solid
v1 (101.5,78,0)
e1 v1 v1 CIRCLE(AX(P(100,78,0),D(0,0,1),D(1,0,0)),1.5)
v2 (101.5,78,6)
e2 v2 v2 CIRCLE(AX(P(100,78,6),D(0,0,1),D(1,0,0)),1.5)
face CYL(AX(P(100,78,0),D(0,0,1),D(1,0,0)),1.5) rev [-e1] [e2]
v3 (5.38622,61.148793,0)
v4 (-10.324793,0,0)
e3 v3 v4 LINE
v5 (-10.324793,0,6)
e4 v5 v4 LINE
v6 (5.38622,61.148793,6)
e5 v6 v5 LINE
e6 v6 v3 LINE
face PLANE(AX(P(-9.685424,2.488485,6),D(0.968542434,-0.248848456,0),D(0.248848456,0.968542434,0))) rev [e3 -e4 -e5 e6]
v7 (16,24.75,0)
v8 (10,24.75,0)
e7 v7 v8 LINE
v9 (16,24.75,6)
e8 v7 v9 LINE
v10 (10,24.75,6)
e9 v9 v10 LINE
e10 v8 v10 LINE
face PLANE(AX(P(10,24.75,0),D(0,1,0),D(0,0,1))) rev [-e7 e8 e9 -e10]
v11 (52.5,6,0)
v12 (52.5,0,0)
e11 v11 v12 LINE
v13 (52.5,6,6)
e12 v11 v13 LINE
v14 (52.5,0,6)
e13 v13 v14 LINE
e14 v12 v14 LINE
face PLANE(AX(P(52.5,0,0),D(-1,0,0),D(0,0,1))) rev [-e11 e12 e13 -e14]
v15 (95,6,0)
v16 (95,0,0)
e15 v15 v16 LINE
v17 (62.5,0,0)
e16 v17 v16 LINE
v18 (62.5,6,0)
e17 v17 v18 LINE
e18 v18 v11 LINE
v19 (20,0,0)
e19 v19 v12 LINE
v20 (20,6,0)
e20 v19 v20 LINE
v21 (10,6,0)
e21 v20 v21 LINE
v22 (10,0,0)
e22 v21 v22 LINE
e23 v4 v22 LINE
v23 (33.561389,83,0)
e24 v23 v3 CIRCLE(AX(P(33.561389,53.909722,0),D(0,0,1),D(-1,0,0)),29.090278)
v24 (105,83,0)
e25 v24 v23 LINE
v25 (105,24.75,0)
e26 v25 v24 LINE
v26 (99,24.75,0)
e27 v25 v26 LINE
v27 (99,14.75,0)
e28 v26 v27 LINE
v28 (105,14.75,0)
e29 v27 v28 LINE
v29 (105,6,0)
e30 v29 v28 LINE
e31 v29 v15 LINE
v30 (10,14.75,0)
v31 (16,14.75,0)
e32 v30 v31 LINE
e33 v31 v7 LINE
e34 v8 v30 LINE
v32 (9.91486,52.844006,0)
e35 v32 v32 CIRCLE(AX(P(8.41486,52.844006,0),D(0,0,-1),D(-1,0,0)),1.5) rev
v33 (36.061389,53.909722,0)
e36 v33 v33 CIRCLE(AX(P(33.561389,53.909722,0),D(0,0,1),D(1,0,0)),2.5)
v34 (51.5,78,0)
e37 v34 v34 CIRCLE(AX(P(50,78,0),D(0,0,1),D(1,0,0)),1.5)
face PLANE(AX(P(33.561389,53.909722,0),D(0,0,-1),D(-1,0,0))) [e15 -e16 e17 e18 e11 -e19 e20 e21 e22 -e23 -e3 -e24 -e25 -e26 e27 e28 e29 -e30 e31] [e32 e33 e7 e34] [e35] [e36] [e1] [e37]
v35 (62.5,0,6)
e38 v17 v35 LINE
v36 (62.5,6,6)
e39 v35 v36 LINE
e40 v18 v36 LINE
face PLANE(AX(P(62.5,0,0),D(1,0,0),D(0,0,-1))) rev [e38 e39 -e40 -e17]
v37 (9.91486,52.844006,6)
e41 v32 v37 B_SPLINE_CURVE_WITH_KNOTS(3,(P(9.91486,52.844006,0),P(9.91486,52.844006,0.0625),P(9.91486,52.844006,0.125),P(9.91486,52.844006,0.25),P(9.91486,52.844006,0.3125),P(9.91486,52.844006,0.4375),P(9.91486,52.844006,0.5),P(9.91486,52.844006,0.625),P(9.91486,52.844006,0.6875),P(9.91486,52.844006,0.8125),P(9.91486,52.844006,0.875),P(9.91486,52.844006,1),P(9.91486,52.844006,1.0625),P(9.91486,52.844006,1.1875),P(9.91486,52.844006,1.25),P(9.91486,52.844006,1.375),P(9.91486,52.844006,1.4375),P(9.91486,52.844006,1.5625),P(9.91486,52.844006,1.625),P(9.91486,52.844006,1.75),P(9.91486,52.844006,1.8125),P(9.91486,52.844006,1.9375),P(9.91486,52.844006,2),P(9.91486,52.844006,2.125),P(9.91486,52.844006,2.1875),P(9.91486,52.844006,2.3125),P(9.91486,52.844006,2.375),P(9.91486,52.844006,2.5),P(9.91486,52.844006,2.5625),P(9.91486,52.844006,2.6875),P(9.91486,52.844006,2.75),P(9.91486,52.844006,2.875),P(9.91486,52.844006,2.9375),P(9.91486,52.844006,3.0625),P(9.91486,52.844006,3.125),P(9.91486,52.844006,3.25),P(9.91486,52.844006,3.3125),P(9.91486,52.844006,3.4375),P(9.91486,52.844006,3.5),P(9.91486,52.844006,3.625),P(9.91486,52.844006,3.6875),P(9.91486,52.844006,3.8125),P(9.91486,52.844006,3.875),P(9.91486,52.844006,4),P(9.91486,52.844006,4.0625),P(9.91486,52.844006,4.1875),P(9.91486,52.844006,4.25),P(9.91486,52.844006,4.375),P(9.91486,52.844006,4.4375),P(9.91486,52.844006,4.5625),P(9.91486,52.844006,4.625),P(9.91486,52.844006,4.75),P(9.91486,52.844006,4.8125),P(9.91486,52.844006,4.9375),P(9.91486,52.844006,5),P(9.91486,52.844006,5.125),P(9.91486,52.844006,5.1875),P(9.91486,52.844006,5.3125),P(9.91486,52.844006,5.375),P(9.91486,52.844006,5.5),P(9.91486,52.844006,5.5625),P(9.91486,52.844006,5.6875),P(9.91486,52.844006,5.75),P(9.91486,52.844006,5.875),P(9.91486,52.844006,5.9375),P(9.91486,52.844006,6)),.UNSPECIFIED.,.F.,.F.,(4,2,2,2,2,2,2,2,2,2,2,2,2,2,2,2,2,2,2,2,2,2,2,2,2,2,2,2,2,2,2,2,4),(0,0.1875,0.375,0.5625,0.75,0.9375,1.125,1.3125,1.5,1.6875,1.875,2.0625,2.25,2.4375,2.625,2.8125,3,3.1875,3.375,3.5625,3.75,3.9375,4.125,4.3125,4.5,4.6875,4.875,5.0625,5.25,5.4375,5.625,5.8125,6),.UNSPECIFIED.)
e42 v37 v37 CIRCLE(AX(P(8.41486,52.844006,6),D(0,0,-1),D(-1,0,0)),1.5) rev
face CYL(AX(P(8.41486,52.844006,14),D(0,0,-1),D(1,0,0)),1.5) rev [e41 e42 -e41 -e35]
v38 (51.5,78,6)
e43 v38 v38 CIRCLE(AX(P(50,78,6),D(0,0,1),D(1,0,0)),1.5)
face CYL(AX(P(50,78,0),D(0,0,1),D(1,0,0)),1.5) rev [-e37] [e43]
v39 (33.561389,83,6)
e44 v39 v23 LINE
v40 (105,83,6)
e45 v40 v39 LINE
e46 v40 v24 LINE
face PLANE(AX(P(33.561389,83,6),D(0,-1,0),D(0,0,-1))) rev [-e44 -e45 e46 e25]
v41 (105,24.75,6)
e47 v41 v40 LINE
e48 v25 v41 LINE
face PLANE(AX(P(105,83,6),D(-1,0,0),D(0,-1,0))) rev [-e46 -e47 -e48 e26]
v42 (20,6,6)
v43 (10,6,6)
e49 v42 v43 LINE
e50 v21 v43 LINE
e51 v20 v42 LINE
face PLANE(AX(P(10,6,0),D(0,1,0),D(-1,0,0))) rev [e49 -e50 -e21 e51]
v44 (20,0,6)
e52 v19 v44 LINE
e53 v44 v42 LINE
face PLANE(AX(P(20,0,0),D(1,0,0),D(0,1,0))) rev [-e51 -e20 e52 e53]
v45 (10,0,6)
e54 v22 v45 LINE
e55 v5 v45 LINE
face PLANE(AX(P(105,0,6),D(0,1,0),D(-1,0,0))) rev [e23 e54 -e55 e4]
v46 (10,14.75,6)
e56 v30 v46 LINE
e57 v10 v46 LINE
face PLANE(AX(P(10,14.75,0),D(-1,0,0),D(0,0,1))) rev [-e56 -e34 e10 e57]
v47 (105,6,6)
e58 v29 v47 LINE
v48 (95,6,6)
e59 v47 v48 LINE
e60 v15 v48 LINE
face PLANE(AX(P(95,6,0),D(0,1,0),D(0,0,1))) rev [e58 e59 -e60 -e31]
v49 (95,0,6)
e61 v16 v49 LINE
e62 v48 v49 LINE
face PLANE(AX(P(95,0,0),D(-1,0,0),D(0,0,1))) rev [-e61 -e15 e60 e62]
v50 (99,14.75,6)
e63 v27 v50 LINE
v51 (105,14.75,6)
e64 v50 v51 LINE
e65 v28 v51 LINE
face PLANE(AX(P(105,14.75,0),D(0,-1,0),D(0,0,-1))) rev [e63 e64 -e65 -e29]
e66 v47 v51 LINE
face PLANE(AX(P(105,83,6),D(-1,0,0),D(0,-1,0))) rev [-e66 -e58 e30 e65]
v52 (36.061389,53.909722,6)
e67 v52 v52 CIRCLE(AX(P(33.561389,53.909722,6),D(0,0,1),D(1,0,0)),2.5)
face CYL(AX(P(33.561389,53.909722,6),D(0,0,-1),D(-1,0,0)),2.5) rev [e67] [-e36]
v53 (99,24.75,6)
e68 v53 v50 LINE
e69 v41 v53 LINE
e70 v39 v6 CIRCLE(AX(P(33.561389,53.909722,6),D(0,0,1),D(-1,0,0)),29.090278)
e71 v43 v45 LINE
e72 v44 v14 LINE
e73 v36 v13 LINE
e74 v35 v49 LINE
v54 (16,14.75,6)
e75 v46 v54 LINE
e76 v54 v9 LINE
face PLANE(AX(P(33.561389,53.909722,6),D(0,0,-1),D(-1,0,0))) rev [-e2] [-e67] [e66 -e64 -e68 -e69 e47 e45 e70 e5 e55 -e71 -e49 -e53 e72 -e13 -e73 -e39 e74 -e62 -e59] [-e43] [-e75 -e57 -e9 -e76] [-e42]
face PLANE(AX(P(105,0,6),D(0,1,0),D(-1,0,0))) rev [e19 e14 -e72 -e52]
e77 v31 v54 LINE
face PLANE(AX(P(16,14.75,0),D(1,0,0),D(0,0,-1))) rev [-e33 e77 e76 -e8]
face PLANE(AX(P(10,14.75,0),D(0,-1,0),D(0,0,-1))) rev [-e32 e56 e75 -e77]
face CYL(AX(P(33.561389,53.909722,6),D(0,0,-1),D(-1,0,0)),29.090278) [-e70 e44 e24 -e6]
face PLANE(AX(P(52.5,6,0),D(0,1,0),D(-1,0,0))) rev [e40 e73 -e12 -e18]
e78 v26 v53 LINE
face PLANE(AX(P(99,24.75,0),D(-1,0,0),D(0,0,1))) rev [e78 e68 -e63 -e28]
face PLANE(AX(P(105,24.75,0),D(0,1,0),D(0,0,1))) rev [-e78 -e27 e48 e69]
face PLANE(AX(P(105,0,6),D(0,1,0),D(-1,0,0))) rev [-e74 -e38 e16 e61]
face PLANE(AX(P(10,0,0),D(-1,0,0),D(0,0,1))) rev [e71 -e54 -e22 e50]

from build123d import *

# Parameters (mm, degrees)
SKETCH1_R           = 2.5
BOSS_EXTRUDE1_DEPTH = 6
SKETCH2_W           = 10
SKETCH2_H           = 6
SKETCH2_W_2         = 6
SKETCH2_H_2         = 10
CUT_EXTRUDE1_DEPTH  = 134.97761007
SKETCH3_R           = 1.5
CUT_EXTRUDE2_DEPTH  = 134.97761007
CAVITY1_OUTLINE_R   = 1.5
CAVITY1_DEPTH       = 6


# Read off the part's stored shape, not the designer's step: Cavity1
with BuildPart() as part:
    # Sketch1 → Boss-Extrude1 (new body)
    with BuildSketch(Plane.XY):
        with BuildLine():
            Line((-9.685424338, 2.488484559), (5.386220056, 61.148792841))
            ThreePointArc((5.386220056, 61.148792841), (15.733633721, 76.897010412), (33.561388608, 83))
            Line((33.561388608, 83), (105, 83))
            Line((105, 83), (105, 0))
            Line((105, 0), (-10.324792855, 0))
            Line((-10.324792855, 0), (-9.685424338, 2.488484559))
        make_face()
        with Locations((33.561388608, 53.909722104)):
            Circle(SKETCH1_R, mode=Mode.SUBTRACT)
    extrude(amount=BOSS_EXTRUDE1_DEPTH)

    # Sketch2 → Cut-Extrude1 (cut, through all)
    with BuildSketch(Plane.XY.offset(6)):
        with Locations((15, 3)):
            Rectangle(SKETCH2_W, SKETCH2_H)
        with Locations((57.5, 3)):
            Rectangle(SKETCH2_W, SKETCH2_H)
        with Locations((100, 3)):
            Rectangle(SKETCH2_W, SKETCH2_H)
        with Locations((102, 19.75)):
            Rectangle(SKETCH2_W_2, SKETCH2_H_2)
        with Locations((13, 19.75)):
            Rectangle(SKETCH2_W_2, SKETCH2_H_2)
    extrude(amount=-CUT_EXTRUDE1_DEPTH, mode=Mode.SUBTRACT)

    # Sketch3 → Cut-Extrude2 (cut, through all)
    with BuildSketch(Plane.XY.offset(6)):
        with Locations((50, 78)):
            Circle(SKETCH3_R)
        with Locations((100, 78)):
            Circle(SKETCH3_R)
    extrude(amount=-CUT_EXTRUDE2_DEPTH, mode=Mode.SUBTRACT)

    # Cavity1 outline → Cavity1 (cut)
    with BuildSketch(Plane.XY):
        with Locations((8.414860226, 52.844005614)):
            Circle(CAVITY1_OUTLINE_R)
    extrude(amount=CAVITY1_DEPTH, mode=Mode.SUBTRACT)


solid = part.part
